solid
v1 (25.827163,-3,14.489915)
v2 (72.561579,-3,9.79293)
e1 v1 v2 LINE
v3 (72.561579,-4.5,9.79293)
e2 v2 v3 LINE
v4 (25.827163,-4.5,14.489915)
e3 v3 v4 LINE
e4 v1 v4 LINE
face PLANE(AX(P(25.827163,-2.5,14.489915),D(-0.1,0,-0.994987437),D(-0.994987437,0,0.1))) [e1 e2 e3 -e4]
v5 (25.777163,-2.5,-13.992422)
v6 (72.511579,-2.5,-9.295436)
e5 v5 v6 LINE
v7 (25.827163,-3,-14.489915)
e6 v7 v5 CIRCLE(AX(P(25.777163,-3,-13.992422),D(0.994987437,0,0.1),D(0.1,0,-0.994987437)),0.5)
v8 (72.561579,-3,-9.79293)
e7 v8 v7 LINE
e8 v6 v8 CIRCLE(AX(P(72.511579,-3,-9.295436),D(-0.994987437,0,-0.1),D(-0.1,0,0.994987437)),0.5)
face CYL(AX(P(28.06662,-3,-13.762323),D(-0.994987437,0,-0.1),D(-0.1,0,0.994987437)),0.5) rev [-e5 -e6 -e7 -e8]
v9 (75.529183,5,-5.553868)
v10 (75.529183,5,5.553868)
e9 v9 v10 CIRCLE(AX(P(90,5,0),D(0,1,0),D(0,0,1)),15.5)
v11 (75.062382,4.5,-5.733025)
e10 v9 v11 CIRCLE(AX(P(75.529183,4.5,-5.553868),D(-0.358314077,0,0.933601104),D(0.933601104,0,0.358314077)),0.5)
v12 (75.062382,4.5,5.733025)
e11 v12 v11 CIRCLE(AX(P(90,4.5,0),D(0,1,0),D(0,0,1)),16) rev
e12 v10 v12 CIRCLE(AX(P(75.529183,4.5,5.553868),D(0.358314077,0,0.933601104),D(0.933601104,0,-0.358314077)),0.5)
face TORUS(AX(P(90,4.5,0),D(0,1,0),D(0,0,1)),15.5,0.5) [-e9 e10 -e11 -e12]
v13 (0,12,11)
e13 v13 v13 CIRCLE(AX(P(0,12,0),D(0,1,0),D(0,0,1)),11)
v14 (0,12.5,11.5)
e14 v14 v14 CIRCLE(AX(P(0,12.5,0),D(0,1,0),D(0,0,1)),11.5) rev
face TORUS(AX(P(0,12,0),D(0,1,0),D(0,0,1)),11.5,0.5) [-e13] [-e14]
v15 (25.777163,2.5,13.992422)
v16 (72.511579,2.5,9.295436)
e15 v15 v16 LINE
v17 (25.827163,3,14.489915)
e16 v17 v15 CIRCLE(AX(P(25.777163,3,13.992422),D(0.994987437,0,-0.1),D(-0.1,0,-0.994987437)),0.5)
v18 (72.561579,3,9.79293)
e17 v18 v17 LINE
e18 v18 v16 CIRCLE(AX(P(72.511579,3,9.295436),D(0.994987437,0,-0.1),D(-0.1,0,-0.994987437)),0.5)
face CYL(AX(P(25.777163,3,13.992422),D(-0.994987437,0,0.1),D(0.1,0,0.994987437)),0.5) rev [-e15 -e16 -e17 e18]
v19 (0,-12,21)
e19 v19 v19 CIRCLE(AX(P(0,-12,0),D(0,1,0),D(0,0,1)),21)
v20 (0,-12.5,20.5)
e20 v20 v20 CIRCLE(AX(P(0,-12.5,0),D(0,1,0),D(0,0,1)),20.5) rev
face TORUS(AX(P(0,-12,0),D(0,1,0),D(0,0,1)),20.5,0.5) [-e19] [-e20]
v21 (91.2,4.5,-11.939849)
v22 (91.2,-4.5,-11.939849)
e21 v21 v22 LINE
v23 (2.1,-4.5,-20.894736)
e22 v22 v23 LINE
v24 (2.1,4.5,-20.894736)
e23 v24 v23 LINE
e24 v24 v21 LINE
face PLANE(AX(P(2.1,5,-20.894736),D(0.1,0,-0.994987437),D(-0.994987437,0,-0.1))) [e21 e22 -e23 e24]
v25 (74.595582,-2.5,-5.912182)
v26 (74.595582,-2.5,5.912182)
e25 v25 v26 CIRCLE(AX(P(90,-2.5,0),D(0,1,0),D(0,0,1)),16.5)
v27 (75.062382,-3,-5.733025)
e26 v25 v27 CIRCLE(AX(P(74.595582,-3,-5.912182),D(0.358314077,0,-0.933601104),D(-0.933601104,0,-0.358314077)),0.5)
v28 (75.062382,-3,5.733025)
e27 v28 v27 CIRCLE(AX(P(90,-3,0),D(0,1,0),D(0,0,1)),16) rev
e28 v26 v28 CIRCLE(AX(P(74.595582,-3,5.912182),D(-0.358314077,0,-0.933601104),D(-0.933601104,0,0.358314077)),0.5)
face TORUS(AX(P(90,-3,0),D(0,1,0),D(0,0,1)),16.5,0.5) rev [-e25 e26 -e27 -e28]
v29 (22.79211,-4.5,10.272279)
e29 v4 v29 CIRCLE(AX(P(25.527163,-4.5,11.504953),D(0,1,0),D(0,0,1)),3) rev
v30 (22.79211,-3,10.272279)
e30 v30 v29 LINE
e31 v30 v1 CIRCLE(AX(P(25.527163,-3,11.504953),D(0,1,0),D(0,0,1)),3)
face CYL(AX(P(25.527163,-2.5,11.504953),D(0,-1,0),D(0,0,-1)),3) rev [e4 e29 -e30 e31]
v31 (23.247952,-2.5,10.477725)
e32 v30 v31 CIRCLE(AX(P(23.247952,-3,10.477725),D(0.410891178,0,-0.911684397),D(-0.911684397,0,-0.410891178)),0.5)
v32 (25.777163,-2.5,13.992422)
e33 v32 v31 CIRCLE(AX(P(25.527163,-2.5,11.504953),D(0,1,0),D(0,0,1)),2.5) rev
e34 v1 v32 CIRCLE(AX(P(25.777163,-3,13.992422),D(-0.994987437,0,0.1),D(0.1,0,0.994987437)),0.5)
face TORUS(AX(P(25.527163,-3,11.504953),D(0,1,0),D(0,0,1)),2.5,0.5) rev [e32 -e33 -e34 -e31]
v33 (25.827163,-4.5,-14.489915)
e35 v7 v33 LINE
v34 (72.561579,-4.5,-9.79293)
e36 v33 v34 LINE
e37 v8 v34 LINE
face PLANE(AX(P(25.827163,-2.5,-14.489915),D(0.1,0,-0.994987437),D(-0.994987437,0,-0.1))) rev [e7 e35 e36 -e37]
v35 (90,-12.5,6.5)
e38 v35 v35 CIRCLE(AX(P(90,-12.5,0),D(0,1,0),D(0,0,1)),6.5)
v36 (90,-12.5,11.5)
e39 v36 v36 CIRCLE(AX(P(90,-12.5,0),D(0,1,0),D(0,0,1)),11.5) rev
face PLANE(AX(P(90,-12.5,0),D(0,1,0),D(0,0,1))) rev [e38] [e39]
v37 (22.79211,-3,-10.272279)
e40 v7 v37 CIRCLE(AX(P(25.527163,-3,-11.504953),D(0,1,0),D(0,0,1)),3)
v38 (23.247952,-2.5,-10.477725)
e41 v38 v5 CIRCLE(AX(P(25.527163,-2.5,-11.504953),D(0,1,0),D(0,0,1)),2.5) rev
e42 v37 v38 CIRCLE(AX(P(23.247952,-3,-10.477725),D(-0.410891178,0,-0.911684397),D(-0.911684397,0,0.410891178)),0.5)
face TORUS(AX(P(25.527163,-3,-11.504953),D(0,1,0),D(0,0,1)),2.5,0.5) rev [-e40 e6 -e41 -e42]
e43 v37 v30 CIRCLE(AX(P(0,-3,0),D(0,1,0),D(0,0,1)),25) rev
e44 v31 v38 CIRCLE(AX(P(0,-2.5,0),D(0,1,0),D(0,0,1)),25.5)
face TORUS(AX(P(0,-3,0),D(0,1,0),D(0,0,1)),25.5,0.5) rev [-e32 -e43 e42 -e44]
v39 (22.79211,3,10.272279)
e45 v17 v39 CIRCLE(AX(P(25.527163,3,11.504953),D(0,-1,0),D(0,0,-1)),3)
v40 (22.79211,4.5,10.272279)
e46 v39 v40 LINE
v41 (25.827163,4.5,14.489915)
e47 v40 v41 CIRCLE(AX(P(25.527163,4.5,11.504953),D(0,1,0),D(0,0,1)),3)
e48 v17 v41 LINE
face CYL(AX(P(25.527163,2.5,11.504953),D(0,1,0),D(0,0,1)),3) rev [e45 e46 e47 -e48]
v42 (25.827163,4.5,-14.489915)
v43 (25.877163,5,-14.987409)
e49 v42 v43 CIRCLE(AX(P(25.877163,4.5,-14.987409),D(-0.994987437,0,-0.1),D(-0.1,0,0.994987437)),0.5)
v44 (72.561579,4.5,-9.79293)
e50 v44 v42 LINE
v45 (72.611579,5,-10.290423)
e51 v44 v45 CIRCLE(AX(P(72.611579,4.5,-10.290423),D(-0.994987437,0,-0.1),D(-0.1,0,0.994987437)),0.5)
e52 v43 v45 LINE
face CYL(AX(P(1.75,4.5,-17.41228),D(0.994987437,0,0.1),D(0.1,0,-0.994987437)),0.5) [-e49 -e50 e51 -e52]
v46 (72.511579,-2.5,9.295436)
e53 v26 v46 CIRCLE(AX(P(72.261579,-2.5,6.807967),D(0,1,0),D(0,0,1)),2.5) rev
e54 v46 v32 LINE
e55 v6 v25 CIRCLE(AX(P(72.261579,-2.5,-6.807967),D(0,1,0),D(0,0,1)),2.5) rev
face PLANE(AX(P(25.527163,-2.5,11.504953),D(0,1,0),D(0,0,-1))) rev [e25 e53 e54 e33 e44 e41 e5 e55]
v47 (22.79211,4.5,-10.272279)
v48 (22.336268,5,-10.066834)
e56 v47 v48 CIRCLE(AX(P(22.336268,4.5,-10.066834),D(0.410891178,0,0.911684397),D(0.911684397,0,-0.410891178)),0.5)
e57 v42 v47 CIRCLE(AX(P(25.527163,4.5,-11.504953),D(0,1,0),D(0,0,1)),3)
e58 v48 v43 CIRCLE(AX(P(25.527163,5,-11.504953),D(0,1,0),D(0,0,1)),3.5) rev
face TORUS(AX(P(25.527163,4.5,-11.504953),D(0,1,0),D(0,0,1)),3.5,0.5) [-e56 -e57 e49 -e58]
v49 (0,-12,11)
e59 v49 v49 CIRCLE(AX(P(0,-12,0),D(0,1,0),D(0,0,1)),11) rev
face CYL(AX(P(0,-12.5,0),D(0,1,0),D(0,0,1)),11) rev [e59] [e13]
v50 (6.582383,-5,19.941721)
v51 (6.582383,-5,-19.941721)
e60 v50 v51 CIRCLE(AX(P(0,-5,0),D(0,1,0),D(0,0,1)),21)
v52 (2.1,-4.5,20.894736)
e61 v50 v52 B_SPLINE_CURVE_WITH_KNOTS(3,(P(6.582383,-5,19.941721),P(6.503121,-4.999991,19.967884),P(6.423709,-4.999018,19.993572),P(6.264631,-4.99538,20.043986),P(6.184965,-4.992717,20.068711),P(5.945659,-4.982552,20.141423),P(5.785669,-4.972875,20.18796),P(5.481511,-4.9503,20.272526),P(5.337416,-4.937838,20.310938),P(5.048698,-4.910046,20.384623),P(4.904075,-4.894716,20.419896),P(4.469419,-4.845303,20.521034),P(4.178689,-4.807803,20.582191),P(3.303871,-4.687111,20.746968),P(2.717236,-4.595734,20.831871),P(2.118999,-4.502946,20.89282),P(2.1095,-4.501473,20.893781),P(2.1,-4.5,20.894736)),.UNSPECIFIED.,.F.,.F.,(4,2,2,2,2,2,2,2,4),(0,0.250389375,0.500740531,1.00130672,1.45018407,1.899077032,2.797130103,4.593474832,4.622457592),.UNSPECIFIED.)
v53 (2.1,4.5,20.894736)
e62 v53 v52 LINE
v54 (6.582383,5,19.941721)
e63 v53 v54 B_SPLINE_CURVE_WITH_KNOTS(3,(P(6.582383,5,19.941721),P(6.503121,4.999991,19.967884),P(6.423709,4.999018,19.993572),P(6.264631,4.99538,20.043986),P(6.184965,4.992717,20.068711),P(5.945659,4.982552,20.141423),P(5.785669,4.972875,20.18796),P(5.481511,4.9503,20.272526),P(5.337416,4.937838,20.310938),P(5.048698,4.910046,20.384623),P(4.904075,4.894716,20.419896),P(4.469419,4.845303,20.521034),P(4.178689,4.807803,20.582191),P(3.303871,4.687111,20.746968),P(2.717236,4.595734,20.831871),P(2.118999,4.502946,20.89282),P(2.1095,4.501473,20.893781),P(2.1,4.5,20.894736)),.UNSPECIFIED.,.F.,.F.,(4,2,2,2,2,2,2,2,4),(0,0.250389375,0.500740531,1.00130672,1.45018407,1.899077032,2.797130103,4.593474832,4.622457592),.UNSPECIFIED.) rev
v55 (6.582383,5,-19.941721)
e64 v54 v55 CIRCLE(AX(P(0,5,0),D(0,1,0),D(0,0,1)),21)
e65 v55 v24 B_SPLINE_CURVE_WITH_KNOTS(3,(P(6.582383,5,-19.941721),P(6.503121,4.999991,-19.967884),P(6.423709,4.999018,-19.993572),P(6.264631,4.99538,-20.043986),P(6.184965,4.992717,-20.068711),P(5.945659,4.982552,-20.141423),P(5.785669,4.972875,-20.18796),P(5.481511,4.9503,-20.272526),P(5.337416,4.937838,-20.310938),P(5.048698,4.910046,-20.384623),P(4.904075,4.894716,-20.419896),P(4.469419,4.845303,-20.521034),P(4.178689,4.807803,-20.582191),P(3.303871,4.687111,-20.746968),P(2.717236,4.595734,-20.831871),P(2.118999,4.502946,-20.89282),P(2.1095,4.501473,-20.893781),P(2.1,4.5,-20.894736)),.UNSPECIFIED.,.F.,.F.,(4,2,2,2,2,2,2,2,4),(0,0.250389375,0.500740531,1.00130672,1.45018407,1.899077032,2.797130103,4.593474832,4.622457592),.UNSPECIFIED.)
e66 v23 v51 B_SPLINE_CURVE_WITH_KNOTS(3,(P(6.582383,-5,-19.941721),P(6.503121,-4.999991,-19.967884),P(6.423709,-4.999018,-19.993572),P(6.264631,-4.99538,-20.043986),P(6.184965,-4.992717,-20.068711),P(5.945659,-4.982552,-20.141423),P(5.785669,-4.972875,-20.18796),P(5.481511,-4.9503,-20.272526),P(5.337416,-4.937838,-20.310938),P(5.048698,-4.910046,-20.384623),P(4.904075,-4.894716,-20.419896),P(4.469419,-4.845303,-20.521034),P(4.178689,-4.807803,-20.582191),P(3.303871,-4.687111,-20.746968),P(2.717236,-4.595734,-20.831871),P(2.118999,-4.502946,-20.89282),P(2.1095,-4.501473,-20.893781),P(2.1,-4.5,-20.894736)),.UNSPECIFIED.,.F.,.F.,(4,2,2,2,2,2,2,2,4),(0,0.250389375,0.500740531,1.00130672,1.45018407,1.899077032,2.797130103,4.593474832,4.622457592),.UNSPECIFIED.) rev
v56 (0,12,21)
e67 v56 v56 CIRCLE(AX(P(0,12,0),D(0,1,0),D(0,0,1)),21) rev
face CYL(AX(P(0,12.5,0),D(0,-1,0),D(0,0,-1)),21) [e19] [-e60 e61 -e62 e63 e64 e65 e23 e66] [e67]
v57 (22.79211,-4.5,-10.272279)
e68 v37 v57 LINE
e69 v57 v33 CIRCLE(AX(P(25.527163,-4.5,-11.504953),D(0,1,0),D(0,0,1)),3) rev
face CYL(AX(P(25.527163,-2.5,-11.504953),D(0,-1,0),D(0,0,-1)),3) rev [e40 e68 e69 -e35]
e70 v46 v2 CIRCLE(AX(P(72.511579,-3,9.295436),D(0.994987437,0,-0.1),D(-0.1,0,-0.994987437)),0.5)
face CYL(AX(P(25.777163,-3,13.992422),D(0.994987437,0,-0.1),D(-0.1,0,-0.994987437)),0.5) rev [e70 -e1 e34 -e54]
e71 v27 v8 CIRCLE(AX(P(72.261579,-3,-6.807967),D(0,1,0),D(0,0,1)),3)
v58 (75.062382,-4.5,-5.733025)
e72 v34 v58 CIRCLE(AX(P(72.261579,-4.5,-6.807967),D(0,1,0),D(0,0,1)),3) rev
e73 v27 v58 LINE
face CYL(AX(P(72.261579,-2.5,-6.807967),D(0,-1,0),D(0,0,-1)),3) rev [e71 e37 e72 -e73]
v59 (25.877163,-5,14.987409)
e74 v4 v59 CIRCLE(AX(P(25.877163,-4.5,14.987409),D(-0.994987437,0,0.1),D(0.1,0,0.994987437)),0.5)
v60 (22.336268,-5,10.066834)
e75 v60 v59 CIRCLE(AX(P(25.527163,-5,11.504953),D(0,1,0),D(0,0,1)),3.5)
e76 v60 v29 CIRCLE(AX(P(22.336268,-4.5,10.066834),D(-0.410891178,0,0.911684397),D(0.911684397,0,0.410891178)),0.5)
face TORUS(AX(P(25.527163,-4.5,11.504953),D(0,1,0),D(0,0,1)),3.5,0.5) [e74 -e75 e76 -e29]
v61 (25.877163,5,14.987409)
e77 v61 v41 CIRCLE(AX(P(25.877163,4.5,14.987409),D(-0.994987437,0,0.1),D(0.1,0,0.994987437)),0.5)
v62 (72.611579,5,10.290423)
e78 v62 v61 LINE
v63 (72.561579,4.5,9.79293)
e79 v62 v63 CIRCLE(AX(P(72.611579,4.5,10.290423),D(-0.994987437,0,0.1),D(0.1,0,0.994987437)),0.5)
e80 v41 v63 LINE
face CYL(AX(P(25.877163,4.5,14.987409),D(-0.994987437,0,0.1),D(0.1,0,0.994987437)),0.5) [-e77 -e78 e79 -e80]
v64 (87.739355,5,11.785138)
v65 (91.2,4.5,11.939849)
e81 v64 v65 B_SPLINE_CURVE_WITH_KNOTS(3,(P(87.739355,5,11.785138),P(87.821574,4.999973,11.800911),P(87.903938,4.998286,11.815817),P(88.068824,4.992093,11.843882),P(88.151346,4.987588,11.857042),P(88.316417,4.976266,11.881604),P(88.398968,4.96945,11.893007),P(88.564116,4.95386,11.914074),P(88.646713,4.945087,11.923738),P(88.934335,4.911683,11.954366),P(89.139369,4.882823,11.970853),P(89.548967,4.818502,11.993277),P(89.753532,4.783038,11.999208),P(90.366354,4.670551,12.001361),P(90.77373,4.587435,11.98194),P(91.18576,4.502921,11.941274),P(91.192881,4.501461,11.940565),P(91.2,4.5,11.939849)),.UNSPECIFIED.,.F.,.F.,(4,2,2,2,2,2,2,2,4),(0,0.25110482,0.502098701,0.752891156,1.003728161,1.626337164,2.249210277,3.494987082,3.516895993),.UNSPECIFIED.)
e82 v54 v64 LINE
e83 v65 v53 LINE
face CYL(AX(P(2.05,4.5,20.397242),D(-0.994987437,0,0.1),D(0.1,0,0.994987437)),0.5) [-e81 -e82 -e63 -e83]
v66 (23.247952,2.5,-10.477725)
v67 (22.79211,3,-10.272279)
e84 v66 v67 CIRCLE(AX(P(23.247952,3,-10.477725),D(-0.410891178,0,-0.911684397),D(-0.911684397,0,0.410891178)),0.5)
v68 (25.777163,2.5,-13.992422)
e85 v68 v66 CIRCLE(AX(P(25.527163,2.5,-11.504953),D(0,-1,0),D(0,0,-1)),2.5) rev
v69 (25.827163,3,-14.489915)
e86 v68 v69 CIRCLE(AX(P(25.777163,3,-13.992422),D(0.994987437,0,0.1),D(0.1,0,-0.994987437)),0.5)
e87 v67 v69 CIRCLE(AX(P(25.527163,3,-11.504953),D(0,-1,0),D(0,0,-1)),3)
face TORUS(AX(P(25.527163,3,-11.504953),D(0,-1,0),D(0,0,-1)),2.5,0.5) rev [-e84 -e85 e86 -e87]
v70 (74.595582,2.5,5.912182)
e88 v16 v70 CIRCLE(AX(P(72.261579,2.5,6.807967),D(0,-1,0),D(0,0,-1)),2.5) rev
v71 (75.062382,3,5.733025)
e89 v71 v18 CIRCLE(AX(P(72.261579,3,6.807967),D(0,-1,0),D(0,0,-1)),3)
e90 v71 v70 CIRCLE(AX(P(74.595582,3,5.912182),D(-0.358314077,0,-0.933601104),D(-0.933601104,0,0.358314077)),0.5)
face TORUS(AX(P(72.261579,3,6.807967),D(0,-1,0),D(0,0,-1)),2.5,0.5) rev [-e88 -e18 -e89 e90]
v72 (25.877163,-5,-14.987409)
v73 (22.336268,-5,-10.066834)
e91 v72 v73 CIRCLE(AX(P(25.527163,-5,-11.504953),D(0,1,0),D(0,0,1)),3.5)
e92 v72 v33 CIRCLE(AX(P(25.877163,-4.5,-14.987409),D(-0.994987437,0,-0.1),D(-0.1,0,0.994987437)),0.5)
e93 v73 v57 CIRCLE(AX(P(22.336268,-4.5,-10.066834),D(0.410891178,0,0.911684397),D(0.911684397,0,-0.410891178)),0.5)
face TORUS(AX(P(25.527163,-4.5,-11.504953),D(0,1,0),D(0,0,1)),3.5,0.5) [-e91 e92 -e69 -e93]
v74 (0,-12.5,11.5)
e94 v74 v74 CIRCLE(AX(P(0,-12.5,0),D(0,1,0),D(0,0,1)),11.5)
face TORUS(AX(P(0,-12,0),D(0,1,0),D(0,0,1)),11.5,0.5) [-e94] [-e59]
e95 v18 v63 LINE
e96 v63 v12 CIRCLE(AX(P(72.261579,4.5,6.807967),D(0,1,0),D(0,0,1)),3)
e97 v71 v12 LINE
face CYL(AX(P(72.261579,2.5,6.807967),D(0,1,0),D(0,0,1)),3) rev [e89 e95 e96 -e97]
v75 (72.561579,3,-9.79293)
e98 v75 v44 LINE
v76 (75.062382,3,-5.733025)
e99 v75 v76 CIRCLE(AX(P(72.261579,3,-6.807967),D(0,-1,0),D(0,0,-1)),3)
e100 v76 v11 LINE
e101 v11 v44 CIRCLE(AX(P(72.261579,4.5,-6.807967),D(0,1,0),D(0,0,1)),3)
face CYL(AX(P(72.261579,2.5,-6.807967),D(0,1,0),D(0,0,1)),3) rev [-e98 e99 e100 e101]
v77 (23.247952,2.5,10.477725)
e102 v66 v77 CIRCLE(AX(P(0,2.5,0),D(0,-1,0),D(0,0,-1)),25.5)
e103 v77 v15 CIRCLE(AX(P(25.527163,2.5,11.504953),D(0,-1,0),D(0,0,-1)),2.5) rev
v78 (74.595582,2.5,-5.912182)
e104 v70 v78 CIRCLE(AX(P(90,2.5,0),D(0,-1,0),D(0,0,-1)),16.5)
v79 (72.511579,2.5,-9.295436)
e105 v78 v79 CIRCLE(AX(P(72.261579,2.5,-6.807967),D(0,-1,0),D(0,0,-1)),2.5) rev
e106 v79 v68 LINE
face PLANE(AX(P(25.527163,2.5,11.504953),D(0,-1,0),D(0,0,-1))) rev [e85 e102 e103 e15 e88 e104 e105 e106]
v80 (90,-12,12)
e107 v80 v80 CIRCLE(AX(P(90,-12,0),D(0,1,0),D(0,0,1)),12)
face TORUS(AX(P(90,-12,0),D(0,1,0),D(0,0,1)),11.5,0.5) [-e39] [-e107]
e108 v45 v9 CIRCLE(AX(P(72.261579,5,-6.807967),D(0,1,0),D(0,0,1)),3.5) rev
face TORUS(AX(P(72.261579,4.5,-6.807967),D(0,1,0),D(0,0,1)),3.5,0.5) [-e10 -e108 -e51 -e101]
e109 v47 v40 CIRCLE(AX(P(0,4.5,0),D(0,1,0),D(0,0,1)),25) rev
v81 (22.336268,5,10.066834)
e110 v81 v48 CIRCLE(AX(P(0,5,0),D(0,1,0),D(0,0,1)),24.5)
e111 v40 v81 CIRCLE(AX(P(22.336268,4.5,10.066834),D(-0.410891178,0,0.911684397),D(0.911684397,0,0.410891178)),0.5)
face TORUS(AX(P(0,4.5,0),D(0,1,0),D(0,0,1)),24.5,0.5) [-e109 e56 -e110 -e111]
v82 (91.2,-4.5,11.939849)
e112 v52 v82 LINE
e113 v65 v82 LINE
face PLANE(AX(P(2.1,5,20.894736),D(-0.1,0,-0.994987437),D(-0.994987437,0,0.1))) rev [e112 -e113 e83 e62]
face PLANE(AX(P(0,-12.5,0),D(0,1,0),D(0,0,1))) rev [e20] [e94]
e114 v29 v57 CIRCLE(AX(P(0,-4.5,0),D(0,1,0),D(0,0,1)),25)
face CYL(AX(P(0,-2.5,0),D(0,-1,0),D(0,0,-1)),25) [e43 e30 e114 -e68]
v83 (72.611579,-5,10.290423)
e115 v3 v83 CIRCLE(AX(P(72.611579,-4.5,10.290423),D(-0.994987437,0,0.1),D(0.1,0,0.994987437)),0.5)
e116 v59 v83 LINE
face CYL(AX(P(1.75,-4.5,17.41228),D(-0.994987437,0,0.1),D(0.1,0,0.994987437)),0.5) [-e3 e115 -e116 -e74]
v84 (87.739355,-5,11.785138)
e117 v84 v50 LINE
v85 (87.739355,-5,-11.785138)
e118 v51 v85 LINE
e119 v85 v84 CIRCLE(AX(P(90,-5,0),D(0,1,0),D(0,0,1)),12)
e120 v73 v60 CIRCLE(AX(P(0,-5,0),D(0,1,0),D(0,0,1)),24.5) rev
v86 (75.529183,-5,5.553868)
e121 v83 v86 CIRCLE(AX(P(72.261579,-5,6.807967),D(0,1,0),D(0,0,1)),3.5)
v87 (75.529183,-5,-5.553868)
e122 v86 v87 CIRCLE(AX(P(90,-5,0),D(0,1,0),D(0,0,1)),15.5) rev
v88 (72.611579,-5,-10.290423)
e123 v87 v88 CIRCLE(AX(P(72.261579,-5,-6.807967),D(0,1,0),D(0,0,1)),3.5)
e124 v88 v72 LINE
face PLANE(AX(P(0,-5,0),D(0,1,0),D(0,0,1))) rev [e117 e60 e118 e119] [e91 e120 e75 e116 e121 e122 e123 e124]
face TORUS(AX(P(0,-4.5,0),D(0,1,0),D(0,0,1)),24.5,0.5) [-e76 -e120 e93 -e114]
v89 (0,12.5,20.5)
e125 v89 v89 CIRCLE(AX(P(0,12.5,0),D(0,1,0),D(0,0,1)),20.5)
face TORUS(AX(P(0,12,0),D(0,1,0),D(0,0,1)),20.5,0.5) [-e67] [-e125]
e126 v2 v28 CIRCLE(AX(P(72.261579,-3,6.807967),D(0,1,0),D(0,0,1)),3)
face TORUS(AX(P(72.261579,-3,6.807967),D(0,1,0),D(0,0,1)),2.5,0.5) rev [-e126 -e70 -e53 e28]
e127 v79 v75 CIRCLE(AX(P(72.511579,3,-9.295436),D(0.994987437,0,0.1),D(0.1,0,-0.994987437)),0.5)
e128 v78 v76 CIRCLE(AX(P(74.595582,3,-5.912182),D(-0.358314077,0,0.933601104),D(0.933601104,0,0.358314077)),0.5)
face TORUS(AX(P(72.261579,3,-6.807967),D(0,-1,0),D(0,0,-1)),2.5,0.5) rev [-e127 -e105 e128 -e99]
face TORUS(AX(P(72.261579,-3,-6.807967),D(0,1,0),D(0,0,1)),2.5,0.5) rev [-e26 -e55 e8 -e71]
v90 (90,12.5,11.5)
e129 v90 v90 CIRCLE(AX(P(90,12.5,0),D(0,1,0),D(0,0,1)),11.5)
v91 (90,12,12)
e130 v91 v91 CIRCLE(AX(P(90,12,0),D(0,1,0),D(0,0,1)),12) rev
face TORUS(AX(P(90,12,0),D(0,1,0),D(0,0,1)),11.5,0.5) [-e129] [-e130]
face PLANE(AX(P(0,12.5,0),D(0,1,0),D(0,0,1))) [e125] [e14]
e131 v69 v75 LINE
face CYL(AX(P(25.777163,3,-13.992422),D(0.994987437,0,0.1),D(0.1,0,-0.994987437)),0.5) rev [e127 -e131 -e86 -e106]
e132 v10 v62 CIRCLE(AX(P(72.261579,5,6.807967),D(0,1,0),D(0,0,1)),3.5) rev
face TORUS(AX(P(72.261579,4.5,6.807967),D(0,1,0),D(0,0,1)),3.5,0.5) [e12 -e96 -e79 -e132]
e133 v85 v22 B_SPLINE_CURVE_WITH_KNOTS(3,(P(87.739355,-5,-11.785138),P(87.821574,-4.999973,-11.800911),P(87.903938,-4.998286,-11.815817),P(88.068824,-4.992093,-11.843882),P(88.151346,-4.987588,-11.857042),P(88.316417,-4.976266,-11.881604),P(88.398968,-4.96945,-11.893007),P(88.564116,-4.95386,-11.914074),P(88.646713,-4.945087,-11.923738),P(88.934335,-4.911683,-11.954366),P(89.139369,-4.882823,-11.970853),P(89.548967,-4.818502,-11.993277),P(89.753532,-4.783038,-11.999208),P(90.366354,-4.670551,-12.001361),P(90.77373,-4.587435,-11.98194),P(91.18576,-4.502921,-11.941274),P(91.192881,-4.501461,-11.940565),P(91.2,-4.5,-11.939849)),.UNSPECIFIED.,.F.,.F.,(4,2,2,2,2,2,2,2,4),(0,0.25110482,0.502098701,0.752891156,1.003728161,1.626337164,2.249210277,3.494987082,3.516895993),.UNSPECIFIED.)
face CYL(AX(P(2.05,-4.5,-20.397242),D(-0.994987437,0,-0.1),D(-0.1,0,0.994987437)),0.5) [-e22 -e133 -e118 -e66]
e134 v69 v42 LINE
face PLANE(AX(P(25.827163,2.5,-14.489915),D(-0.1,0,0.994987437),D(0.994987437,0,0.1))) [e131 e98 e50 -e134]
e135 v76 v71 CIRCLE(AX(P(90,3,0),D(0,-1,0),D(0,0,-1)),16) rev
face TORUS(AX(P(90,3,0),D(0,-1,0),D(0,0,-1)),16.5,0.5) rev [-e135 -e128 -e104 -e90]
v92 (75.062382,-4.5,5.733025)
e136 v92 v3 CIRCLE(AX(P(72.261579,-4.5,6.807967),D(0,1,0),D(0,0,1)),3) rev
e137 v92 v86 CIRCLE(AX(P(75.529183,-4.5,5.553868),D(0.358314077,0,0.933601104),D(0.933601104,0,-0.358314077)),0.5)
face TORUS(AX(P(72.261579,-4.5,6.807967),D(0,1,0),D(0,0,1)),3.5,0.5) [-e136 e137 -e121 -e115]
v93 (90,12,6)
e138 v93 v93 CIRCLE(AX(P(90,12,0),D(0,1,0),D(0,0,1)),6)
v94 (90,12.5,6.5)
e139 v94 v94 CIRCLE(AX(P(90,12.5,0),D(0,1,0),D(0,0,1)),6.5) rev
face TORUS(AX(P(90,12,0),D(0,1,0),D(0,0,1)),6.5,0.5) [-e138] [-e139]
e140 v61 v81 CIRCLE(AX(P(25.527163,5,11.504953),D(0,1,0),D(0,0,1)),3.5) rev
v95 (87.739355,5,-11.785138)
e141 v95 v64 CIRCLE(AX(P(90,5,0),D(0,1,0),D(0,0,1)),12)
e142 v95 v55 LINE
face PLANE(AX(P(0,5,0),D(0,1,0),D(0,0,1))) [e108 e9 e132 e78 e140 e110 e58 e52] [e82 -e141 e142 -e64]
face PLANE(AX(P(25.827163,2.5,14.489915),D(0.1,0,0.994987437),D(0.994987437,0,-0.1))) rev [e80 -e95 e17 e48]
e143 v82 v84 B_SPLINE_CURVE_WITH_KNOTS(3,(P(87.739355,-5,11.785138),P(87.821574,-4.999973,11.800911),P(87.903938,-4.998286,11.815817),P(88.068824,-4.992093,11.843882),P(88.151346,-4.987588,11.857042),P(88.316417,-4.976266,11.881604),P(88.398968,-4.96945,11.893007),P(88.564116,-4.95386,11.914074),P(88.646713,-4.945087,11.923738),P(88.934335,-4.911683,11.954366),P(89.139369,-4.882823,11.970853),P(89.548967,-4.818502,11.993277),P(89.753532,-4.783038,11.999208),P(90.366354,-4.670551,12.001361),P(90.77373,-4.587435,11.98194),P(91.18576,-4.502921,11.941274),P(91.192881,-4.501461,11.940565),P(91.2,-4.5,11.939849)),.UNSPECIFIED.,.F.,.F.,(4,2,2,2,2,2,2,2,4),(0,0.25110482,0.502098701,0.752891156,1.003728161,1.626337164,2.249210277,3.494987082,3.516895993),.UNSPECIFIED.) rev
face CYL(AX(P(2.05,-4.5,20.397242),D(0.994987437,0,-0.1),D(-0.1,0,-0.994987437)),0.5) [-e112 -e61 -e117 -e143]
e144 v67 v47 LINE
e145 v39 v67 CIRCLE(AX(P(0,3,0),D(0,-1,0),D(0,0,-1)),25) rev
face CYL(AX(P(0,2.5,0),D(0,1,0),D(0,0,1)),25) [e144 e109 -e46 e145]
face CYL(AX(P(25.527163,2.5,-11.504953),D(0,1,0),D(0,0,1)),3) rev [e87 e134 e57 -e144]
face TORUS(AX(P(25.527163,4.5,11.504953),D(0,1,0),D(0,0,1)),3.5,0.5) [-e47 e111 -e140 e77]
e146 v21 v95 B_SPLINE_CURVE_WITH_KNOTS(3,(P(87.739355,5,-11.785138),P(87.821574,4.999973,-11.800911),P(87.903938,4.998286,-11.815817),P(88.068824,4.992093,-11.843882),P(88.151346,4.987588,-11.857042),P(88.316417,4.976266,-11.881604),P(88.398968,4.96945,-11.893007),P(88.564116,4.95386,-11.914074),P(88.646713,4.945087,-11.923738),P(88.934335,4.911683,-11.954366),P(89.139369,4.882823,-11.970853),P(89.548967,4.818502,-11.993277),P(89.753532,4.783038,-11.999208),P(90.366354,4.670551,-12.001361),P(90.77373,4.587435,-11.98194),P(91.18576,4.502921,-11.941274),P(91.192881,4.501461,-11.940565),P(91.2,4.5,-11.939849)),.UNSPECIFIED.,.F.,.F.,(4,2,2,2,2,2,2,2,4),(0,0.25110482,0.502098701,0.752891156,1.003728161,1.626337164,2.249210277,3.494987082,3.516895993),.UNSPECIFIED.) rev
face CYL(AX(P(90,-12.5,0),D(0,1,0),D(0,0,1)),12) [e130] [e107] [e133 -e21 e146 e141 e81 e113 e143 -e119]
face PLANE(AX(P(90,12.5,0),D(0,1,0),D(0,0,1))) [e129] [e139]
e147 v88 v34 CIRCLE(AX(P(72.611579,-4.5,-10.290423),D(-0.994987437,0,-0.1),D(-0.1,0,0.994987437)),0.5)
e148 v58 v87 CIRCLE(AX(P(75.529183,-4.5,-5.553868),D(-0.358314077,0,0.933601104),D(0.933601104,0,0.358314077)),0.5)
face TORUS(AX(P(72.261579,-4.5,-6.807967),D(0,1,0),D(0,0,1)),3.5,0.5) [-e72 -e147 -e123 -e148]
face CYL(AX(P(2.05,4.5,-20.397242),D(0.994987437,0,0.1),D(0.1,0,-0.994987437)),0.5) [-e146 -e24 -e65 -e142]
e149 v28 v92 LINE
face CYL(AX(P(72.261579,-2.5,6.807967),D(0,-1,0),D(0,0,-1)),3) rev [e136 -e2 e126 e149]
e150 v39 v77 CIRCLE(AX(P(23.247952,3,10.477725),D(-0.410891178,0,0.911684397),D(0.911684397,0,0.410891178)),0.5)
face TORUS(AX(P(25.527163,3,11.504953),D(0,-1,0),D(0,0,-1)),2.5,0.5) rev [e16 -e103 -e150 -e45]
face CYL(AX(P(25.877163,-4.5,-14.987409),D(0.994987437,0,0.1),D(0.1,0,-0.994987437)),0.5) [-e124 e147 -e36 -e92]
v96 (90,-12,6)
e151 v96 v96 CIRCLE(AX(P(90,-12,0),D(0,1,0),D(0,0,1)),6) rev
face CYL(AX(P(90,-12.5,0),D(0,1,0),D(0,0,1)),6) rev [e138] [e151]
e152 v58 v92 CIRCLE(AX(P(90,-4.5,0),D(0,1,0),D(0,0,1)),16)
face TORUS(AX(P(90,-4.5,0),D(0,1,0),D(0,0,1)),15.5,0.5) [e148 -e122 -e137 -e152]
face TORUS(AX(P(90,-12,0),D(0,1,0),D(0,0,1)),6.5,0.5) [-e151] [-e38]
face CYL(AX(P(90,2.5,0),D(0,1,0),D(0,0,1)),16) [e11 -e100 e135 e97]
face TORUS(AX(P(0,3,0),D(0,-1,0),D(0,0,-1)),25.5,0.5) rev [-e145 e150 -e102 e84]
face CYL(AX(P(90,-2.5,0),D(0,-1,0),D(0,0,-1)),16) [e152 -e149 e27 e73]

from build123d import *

# Parameters (mm, degrees)
SKETCH1_R           = 21
BOSS_EXTRUDE1_DEPTH = 12.5
SKETCH2_R           = 11
CUT_EXTRUDE1_DEPTH  = 25
SKETCH3_R           = 12
BOSS_EXTRUDE2_DEPTH = 25
SKETCH4_R           = 6
CUT_EXTRUDE2_DEPTH  = 25
BOSS_EXTRUDE3_DEPTH = 5
CUT_EXTRUDE3_DEPTH  = 2.5
FILLET1_R           = 0.5
FILLET2_R           = 0.5


with BuildPart() as part:
    # Sketch1 → Boss-Extrude1 (new, symmetric)
    with BuildSketch(Plane(origin=(0, 0, 0), x_dir=(1, 0, 0), z_dir=(0, 1, 0))):
        with Locations(Location((0, 0, 0), (0, 0, 270))):
            Circle(SKETCH1_R)
    extrude(amount=BOSS_EXTRUDE1_DEPTH, both=True)

    # Sketch2 → Cut-Extrude1 (cut)
    with BuildSketch(Plane(origin=(0, 12.5, 0), x_dir=(1, 0, 0), z_dir=(0, 1, 0))):
        with Locations(Location((0, 0, 0), (0, 0, 270))):
            Circle(SKETCH2_R)
    extrude(amount=-CUT_EXTRUDE1_DEPTH, mode=Mode.SUBTRACT)



with BuildPart() as body_2:
    # Sketch3 → Boss-Extrude2 (new body)
    with BuildSketch(Plane(origin=(0, 12.5, 0), x_dir=(1, 0, 0), z_dir=(0, 1, 0))):
        with Locations(Location((90, 0, 0), (0, 0, 270))):
            Circle(SKETCH3_R)
    extrude(amount=-BOSS_EXTRUDE2_DEPTH)

    # Sketch4 → Cut-Extrude2 (cut)
    with BuildSketch(Plane(origin=(0, 12.5, 0), x_dir=(1, 0, 0), z_dir=(0, 1, 0))):
        with Locations(Location((90, 0, 0), (0, 0, 270))):
            Circle(SKETCH4_R)
    extrude(amount=-CUT_EXTRUDE2_DEPTH, mode=Mode.SUBTRACT)


with BuildPart() as part_1:
    add(part.part)

    add(body_2.part)  # Boss-Extrude3 merges body 2
    # Sketch8 → Boss-Extrude3 (add, symmetric)
    with BuildSketch(Plane(origin=(0, 0, 0), x_dir=(1, 0, 0), z_dir=(0, 1, 0))):
        with BuildLine():
            Line((2.1, 20.894736179), (91.2, 11.939849245))
            ThreePointArc((91.2, 11.939849245), (78, 0), (91.2, -11.939849245))
            Line((91.2, -11.939849245), (2.1, -20.894736179))
            ThreePointArc((2.1, -20.894736179), (21, 0), (2.1, 20.894736179))
        make_face()
    extrude(amount=BOSS_EXTRUDE3_DEPTH, both=True)

    # Sketch9 → Cut-Extrude3 (cut)
    with BuildSketch(Plane(origin=(0, 5, 0), x_dir=(1, 0, 0), z_dir=(0, 1, 0))):
        with BuildLine():
            Line((25.827163115, 14.4899153), (72.561579016, 9.792929775))
            ThreePointArc((72.561579016, 9.792929775), (74.815879609, 8.381355044), (75.062382329, 5.733025232))
            ThreePointArc((75.062382329, 5.733025232), (74, 0), (75.062382329, -5.733025232))
            ThreePointArc((75.062382329, -5.733025232), (74.815879609, -8.381355044), (72.561579016, -9.792929775))
            Line((72.561579016, -9.792929775), (25.827163115, -14.4899153))
            ThreePointArc((25.827163115, -14.4899153), (23.092109925, -13.257241766), (22.792109925, -10.272279454))
            ThreePointArc((22.792109925, -10.272279454), (25, 0), (22.792109925, 10.272279454))
            ThreePointArc((22.792109925, 10.272279454), (23.092109925, 13.257241766), (25.827163115, 14.4899153))
        make_face()
    cut_extrude3 = extrude(amount=-CUT_EXTRUDE3_DEPTH, mode=Mode.SUBTRACT)

    # Mirror1: Cut-Extrude3 across plane
    add(cut_extrude3.mirror(Plane.ZX), mode=Mode.SUBTRACT)

    # Fillet1
    # the kernel refuses this fillet: 0.5 mm, written as the material it takes off along each edge
    with BuildSketch(Plane(origin=(94.931202889, -5, 11.564849245), x_dir=(0, 1, 0), z_dir=(-0.9949874371066201, 0, 0.09999999999999998))) as fillet1_piece_1_section:
        with BuildLine():
            CenterArc((FILLET1_R, FILLET1_R), FILLET1_R, 180, 90)
            Line((0, FILLET1_R), (0, 0))
            Line((0, 0), (FILLET1_R, 0))
        make_face()
    fillet1_piece_1 = extrude(amount=99.54886934, mode=Mode.PRIVATE)
    fillet1_piece_1 = fillet1_piece_1 - Plane(origin=(0, -5, 0), x_dir=(0, 0, 1), z_dir=(0, 1, 0)) * Cylinder(21, 202, mode=Mode.PRIVATE)
    fillet1_piece_1 = fillet1_piece_1 - Plane(origin=(90, -5, 0), x_dir=(0, 0, 1), z_dir=(0, 1, 0)) * Cylinder(12, 202, mode=Mode.PRIVATE)
    add(fillet1_piece_1, mode=Mode.SUBTRACT)
    with BuildSketch(Plane(origin=(-4.118671482, 5, -21.519736179), x_dir=(0, -1, 0), z_dir=(0.9949874371066201, 0, 0.09999999999999996))) as fillet1_piece_2_section:
        with BuildLine():
            CenterArc((FILLET1_R, -FILLET1_R), FILLET1_R, 90, 90)
            Line((0, -FILLET1_R), (0, 0))
            Line((0, 0), (FILLET1_R, 0))
        make_face()
    fillet1_piece_2 = extrude(amount=99.54886934, mode=Mode.PRIVATE)
    fillet1_piece_2 = fillet1_piece_2 - Plane(origin=(0, 5, 0), x_dir=(0, 0, 1), z_dir=(0, 1, 0)) * Cylinder(21, 202, mode=Mode.PRIVATE)
    fillet1_piece_2 = fillet1_piece_2 - Plane(origin=(90, 5, 0), x_dir=(0, 0, 1), z_dir=(0, 1, 0)) * Cylinder(12, 202, mode=Mode.PRIVATE)
    add(fillet1_piece_2, mode=Mode.SUBTRACT)
    with BuildSketch(Plane(origin=(94.931202889, 5, 11.564849245), x_dir=(0, -1, 0), z_dir=(-0.9949874371066201, 0, 0.09999999999999998))) as fillet1_piece_3_section:
        with BuildLine():
            CenterArc((FILLET1_R, -FILLET1_R), FILLET1_R, 90, 90)
            Line((0, -FILLET1_R), (0, 0))
            Line((0, 0), (FILLET1_R, 0))
        make_face()
    fillet1_piece_3 = extrude(amount=99.54886934, mode=Mode.PRIVATE)
    fillet1_piece_3 = fillet1_piece_3 - Plane(origin=(0, 5, 0), x_dir=(0, 0, 1), z_dir=(0, 1, 0)) * Cylinder(21, 202, mode=Mode.PRIVATE)
    fillet1_piece_3 = fillet1_piece_3 - Plane(origin=(90, 5, 0), x_dir=(0, 0, 1), z_dir=(0, 1, 0)) * Cylinder(12, 202, mode=Mode.PRIVATE)
    add(fillet1_piece_3, mode=Mode.SUBTRACT)
    with BuildSketch(Plane(origin=(-4.118671482, -5, -21.519736179), x_dir=(-0.09999999999999994, 0, 0.99498743710662), z_dir=(0.9949874371066201, 0, 0.09999999999999996))) as fillet1_piece_4_section:
        with BuildLine():
            CenterArc((FILLET1_R, -FILLET1_R), FILLET1_R, 90, 90)
            Line((0, -FILLET1_R), (0, 0))
            Line((0, 0), (FILLET1_R, 0))
        make_face()
    fillet1_piece_4 = extrude(amount=99.54886934, mode=Mode.PRIVATE)
    fillet1_piece_4 = fillet1_piece_4 - Plane(origin=(0, -5, 0), x_dir=(0, 0, 1), z_dir=(0, 1, 0)) * Cylinder(21, 202, mode=Mode.PRIVATE)
    fillet1_piece_4 = fillet1_piece_4 - Plane(origin=(90, -5, 0), x_dir=(0, 0, 1), z_dir=(0, 1, 0)) * Cylinder(12, 202, mode=Mode.PRIVATE)
    add(fillet1_piece_4, mode=Mode.SUBTRACT)
    with BuildSketch(Plane(origin=(0, -12.5, 0), x_dir=(0, 0, 1), z_dir=(-1, 0, 0))) as fillet1_piece_5:
        with BuildLine():
            CenterArc((21 - FILLET1_R, FILLET1_R), FILLET1_R, 270, 90)
            Line((21 - FILLET1_R, 0), (21, 0))
            Line((21, 0), (21, FILLET1_R))
        make_face()
    revolve(axis=Axis((0, -12.5, 0), (0, 1, 0)), mode=Mode.SUBTRACT)
    with BuildSketch(Plane(origin=(90, -12.5, 0), x_dir=(0, 0, 1), z_dir=(-1, 0, 0))) as fillet1_piece_6:
        with BuildLine():
            CenterArc((12 - FILLET1_R, FILLET1_R), FILLET1_R, 270, 90)
            Line((12 - FILLET1_R, 0), (12, 0))
            Line((12, 0), (12, FILLET1_R))
        make_face()
    revolve(axis=Axis((90, -12.5, 0), (0, 1, 0)), mode=Mode.SUBTRACT)
    with BuildSketch(Plane(origin=(90, -12.5, 0), x_dir=(0, 0, 1), z_dir=(-1, 0, 0))) as fillet1_piece_7:
        with BuildLine():
            CenterArc((6 + FILLET1_R, FILLET1_R), FILLET1_R, 180, 90)
            Line((6, FILLET1_R), (6, 0))
            Line((6, 0), (6 + FILLET1_R, 0))
        make_face()
    revolve(axis=Axis((90, -12.5, 0), (0, 1, 0)), mode=Mode.SUBTRACT)
    with BuildSketch(Plane(origin=(90, 12.5, 0), x_dir=(0, 0, 1), z_dir=(-1, 0, 0))) as fillet1_piece_8:
        with BuildLine():
            CenterArc((12 - FILLET1_R, -FILLET1_R), FILLET1_R, 0, 90)
            Line((12 - FILLET1_R, 0), (12, 0))
            Line((12, 0), (12, -FILLET1_R))
        make_face()
    revolve(axis=Axis((90, 12.5, 0), (0, 1, 0)), mode=Mode.SUBTRACT)
    with BuildSketch(Plane(origin=(90, 12.5, 0), x_dir=(0, 0, 1), z_dir=(-1, 0, 0))) as fillet1_piece_9:
        with BuildLine():
            CenterArc((6 + FILLET1_R, -FILLET1_R), FILLET1_R, 90, 90)
            Line((6, -FILLET1_R), (6, 0))
            Line((6, 0), (6 + FILLET1_R, 0))
        make_face()
    revolve(axis=Axis((90, 12.5, 0), (0, 1, 0)), mode=Mode.SUBTRACT)
    with BuildSketch(Plane(origin=(0, 12.5, 0), x_dir=(0, 0, 1), z_dir=(-1, 0, 0))) as fillet1_piece_10:
        with BuildLine():
            CenterArc((21 - FILLET1_R, -FILLET1_R), FILLET1_R, 0, 90)
            Line((21 - FILLET1_R, 0), (21, 0))
            Line((21, 0), (21, -FILLET1_R))
        make_face()
    revolve(axis=Axis((0, 12.5, 0), (0, 1, 0)), mode=Mode.SUBTRACT)
    with BuildSketch(Plane(origin=(0, -12.5, 0), x_dir=(0, 0, 1), z_dir=(-1, 0, 0))) as fillet1_piece_11:
        with BuildLine():
            CenterArc((11 + FILLET1_R, FILLET1_R), FILLET1_R, 180, 90)
            Line((11, FILLET1_R), (11, 0))
            Line((11, 0), (11 + FILLET1_R, 0))
        make_face()
    revolve(axis=Axis((0, -12.5, 0), (0, 1, 0)), mode=Mode.SUBTRACT)
    with BuildSketch(Plane(origin=(0, 12.5, 0), x_dir=(0, 0, 1), z_dir=(-1, 0, 0))) as fillet1_piece_12:
        with BuildLine():
            CenterArc((11 + FILLET1_R, -FILLET1_R), FILLET1_R, 90, 90)
            Line((11, -FILLET1_R), (11, 0))
            Line((11, 0), (11 + FILLET1_R, 0))
        make_face()
    revolve(axis=Axis((0, 12.5, 0), (0, 1, 0)), mode=Mode.SUBTRACT)

    # Fillet2
    fillet2_edges = [part_1.edges().sort_by_distance(p)[0] for p in [
        (23.092109925, 5, 13.257241766),
        (25, 5, 0),
        (23.092109925, 2.5, -13.257241766),
        (49.194371066, 5, -12.141422538),
        (74.815879609, 5, -8.381355044),
        (74, 5, 0),
        (74.815879609, 5, 8.381355044),
        (49.194371066, 2.5, 12.141422538),
        (23.092109925, 2.5, 13.257241766),
        (25, 2.5, 0),
        (49.194371066, 2.5, -12.141422538),
        (74.815879609, 2.5, -8.381355044),
        (74, 2.5, 0),
        (74.815879609, 2.5, 8.381355044),
        (49.194371066, 5, 12.141422538),
        (23.092109925, 5, -13.257241766),
        (23.092109925, -2.5, 13.257241766),
        (49.194371066, -5, 12.141422538),
        (74.815879609, -2.5, 8.381355044),
        (74, -2.5, 0),
        (74.815879609, -2.5, -8.381355044),
        (49.194371066, -2.5, -12.141422538),
        (23.092109925, -5, -13.257241766),
        (25, -2.5, 0),
        (49.194371066, -2.5, 12.141422538),
        (23.092109925, -2.5, -13.257241766),
        (23.092109925, -5, 13.257241766),
        (25, -5, 0),
        (49.194371066, -5, -12.141422538),
        (74.815879609, -5, -8.381355044),
        (74, -5, 0),
        (74.815879609, -5, 8.381355044),
    ]]
    fillet(fillet2_edges, radius=FILLET2_R)


solid = part_1.part
